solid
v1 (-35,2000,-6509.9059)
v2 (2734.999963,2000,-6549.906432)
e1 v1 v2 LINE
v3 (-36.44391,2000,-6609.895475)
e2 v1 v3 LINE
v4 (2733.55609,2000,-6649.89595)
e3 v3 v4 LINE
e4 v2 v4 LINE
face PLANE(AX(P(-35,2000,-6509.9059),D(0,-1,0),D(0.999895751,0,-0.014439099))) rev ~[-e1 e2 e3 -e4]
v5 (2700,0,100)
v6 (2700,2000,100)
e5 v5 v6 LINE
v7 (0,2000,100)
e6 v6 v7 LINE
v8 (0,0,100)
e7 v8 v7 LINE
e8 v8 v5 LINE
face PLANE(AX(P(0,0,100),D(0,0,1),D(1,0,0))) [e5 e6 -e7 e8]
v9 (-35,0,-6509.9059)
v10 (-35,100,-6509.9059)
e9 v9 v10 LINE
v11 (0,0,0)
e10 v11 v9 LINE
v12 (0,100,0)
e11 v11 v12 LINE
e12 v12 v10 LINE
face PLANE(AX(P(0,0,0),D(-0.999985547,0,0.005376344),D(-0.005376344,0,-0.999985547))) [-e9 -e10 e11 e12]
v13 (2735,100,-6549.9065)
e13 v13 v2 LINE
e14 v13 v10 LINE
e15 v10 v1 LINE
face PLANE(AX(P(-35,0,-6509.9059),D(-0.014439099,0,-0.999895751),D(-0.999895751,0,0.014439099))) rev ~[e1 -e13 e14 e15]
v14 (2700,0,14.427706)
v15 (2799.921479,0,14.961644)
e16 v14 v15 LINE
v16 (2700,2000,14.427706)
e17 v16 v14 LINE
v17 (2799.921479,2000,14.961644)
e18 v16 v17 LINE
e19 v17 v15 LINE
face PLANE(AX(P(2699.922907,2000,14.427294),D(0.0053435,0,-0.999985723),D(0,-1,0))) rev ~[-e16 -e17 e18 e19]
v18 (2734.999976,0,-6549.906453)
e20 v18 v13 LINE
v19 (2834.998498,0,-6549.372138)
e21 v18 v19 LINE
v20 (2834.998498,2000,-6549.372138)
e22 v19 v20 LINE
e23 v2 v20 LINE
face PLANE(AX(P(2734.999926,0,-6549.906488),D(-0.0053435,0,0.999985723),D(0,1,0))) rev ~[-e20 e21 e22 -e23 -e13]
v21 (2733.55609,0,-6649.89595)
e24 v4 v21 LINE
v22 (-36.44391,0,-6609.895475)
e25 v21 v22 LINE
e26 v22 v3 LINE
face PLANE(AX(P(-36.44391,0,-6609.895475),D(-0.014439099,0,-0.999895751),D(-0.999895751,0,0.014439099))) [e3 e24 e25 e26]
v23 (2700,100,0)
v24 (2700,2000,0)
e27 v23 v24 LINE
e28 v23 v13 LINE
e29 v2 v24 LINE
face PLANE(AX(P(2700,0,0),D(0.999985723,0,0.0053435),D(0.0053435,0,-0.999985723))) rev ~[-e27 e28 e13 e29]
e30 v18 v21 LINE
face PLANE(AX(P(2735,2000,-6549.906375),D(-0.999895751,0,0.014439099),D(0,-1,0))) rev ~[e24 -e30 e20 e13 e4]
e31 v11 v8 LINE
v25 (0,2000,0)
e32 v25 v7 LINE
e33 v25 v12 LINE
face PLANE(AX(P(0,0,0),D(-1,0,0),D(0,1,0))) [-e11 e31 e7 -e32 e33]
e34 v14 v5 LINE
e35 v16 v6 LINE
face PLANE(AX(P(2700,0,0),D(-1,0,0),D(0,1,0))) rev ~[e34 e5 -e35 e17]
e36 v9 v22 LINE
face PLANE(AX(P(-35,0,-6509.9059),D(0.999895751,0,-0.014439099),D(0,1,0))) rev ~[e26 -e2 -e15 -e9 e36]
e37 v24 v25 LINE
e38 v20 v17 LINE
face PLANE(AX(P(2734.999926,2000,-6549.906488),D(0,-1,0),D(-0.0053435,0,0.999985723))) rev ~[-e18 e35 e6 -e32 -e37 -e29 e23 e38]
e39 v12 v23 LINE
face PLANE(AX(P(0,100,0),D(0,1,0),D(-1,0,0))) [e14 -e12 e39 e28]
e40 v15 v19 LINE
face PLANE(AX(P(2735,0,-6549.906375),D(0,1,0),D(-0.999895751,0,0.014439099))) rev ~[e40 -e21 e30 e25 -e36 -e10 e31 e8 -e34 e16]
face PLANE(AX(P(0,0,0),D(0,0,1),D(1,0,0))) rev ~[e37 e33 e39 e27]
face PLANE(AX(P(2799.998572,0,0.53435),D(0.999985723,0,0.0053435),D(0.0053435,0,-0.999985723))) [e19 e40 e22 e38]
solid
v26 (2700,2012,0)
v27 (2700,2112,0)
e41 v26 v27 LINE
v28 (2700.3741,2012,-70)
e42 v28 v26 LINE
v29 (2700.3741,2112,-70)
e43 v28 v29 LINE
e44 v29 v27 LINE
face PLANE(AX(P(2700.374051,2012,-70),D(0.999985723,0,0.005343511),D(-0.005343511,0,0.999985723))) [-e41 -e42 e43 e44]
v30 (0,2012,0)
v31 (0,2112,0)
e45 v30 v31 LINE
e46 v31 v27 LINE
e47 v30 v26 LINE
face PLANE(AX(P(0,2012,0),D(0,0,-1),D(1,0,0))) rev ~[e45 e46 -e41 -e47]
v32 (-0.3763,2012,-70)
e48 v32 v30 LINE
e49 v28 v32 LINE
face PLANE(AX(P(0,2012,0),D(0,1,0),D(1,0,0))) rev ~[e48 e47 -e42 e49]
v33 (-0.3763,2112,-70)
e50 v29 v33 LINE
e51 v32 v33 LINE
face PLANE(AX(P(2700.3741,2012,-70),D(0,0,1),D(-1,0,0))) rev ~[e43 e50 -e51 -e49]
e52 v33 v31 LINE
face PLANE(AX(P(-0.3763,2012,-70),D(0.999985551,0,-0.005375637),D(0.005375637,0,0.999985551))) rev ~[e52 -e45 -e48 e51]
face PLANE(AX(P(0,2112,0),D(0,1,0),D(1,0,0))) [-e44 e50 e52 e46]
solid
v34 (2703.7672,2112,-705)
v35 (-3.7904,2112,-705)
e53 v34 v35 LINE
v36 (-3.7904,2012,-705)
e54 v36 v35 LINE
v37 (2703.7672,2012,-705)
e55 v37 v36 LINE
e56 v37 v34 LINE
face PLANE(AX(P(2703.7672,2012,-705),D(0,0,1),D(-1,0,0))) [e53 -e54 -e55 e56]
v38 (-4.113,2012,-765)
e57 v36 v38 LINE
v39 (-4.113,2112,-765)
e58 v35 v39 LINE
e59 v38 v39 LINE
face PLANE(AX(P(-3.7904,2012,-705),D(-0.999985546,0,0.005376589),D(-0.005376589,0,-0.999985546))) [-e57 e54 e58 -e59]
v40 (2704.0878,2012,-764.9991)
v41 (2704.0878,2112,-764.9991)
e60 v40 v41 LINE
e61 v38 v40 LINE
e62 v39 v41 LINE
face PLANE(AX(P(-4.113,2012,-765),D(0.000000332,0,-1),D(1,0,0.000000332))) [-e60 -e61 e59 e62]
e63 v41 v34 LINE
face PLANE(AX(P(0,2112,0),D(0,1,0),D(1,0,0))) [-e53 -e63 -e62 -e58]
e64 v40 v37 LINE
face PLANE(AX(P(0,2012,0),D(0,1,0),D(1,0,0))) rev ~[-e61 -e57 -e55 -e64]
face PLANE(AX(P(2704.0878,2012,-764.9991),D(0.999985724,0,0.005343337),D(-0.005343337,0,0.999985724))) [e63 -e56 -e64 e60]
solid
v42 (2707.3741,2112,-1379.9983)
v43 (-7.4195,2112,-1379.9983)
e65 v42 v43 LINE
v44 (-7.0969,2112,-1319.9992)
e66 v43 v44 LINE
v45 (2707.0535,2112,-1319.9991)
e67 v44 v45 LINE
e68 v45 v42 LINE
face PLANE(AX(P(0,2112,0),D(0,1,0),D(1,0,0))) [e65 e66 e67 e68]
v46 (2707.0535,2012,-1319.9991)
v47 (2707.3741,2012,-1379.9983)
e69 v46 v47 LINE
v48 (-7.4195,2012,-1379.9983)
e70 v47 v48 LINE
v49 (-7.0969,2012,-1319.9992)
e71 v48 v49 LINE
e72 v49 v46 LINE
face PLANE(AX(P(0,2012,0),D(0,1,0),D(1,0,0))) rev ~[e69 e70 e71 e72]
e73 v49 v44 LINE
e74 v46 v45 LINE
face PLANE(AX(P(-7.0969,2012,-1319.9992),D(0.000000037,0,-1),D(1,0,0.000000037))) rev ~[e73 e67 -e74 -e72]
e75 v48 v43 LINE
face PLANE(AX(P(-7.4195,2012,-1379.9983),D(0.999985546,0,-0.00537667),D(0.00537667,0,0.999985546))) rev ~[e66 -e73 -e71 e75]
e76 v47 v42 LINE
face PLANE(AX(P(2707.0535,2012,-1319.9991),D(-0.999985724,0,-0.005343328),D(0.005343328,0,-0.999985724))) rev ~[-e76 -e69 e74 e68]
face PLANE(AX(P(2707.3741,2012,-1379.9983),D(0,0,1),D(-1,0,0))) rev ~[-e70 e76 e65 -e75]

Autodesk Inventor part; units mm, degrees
ref_plane "YZ Plane" through (0, 0, 0) normal (1, 0, 0) x (0, 1, 0)
ref_plane "XZ Plane" through (0, 0, 0) normal (0, 1, 0) x (-1, 0, 0)
ref_plane "XY Plane" through (0, 0, 0) normal (0, 0, 1) x (1, 0, 0)
sketch "Skizze1" plane through (0, 0, 0) normal (0, 1, 0) x (-1, 0, 0)
  line L0 (0, 0) -> (35, -6509.9059)
  line L1 (0, 0) -> (-2700, 0)
  line L2 (-2700, 0) -> (-2735, -6549.9065)
  line L3 (-2735, -6549.9065) -> (35, -6509.9059)
  line L4 (-1350, 0) -> (-1350, -6529.9062) construction
  dimension "d0" = 6510
  dimension "d1" = 2700
  dimension "d2" = 6550
  dimension "d3" = 2770
  dimension "d4" = 1350
extrude "Extrusion1" add sketch "Skizze1" along normal blind 100
sketch "Skizze2" plane through (0, 0, 0) normal (0, 0, 1) x (1, 0, 0)
  line L0 (0, 0) -> (0, 100) projected
  line L1 (0, 0) -> (2700, 0)
  line L2 (2700, 0) -> (2700, 2000)
  line L3 (2700, 2000) -> (0, 2000)
  line L4 (0, 2000) -> (0, 0)
  dimension "d7" = 2000
extrude "Extrusion2" add sketch "Skizze2" along normal blind 100
sketch "Skizze3" plane through (2700, 0, 0) normal (0.9999857, 0, 0.0053435) x (0.0053435, 0, -0.9999857)
  line L0 (-14.4275, 0) -> (6550, 0)
  line L1 (6550, 0) -> (6550, 2000)
  line L2 (6550, 2000) -> (-14.4275, 2000)
  line L3 (-14.4275, 2000) -> (-14.4275, 0)
  dimension "d10" = 2000
extrude "Extrusion3" add sketch "Skizze3" along normal blind 100
sketch "Skizze4" plane through (-35, 0, -6509.9059) normal (-0.0144391, 0, -0.9998958) x (-0.9998958, 0, 0.0144391)
  line L0 (-2770.2888, 0) -> (0, 0)
  line L1 (0, 0) -> (0, 2000)
  line L2 (0, 2000) -> (-2770.2888, 2000)
  line L3 (-2770.2888, 2000) -> (-2770.2888, 0)
  line L4 (0, 0) -> (-2770.2888, 0) projected
  point P0 (59.0011, 0)
  dimension "d13" = 2000
extrude "Extrusion4" add sketch "Skizze4" along normal blind 100
ref_plane "Arbeitsebene1" through (0, 2012, 0) normal (0, 1, 0) x (1, 0, 0)
sketch "Skizze5" plane through (0, 2012, 0) normal (0, 1, 0) x (1, 0, 0)
  line L0 (0, 0) -> (2700, 0) projected
  line L1 (0, 0) -> (2700.3741, 0)
  line L2 (2700.3741, 0) -> (2700.3741, 70)
  line L3 (2700.3741, 70) -> (-0.3763, 70)
  line L4 (-0.3763, 70) -> (0, 0)
  line L5 (2735, 6549.9065) -> (2700, 0) projected
  line L6 (-35, 6509.9059) -> (0, 0) projected
  dimension "d17" = 70
extrude "Extrusion5" add sketch "Skizze5" along normal blind 100 contours L4 L3 L5 L0
sketch "Skizze6" plane through (0, 2012, 0) normal (0, 1, 0) x (1, 0, 0)
  line L0 (2703.7672, 705) -> (-3.7904, 705)
  line L1 (-3.7904, 705) -> (-4.113, 765)
  line L2 (-4.113, 765) -> (2704.0878, 764.9991)
  line L3 (2704.0878, 764.9991) -> (2703.7672, 705)
  line L4 (-35, 6509.9059) -> (0, 0) projected
  line L5 (2700.3741, 70) -> (-0.3763, 70) projected
  line L6 (2735, 6549.9065) -> (2700, 0) projected
  dimension "d20" = 635
  dimension "d21" = 60
  dimension "d22" = 60
extrude "Extrusion6" add sketch "Skizze6" along normal blind 100 contours L0 L1 L2 L3
sketch "Skizze7" plane through (0, 2012, 0) normal (0, 1, 0) x (1, 0, 0)
  line L0 (2707.3741, 1379.9983) -> (-7.4195, 1379.9983)
  line L1 (-7.4195, 1379.9983) -> (-7.0969, 1319.9992)
  line L2 (-7.0969, 1319.9992) -> (2707.0535, 1319.9991)
  line L3 (2707.0535, 1319.9991) -> (2707.3741, 1379.9983)
  line L4 (2735, 6549.9065) -> (2700, 0) projected
  line L5 (-35, 6509.9059) -> (0, 0) projected
  line L6 (2704.0878, 764.9991) -> (-4.113, 765) projected
  dimension "d25" = 60
  dimension "d26" = 60
  dimension "d27" = 555
extrude "Extrusion7" add sketch "Skizze7" along normal blind 100 contours L3 L2 L1 L0
sketch "Skizze8" plane through (0, 2012, 0) normal (0, 1, 0) x (1, 0, 0)
  line L0 (2700, 0) -> (2735, 6549.9065) construction
  line L1 (2710.3398, 1934.9983) -> (-10.4034, 1934.9983)
  line L2 (-10.4034, 1934.9983) -> (-10.726, 1994.9983)
  line L3 (-10.726, 1994.9983) -> (2710.6604, 1994.9983)
  line L4 (2710.6604, 1994.9983) -> (2710.3398, 1934.9983)
  line L5 (-35, 6509.9059) -> (0, 0) construction
  line L6 (2707.3741, 1379.9983) -> (-7.4195, 1379.9983) projected
  line L7 (2735, 6549.9065) -> (2733.5561, 6649.8961) projected
  line L8 (2735, 6549.9065) -> (-35, 6509.9059)
  line L9 (-35, 6509.9059) -> (-34.6237, 6439.9059)
  line L10 (-34.6237, 6439.9059) -> (2734.6259, 6479.8938)
  line L11 (2734.6259, 6479.8938) -> (2735, 6549.9065)
  line L12 (2731.1525, 5829.8938) -> (-31.344, 5829.8938)
  line L13 (0, 0) -> (-35, 6509.9059) projected
  line L14 (2730.8319, 5769.8938) -> (-31.0214, 5769.8938)
  dimension "d30" = 60
  dimension "d31" = 60
  dimension "d32" = 555
  dimension "d33" = 70
  dimension "d34" = 70
  dimension "d35" = 60
  dimension "d36" = 60
  dimension "d37" = 650
equation "\"d4\" = 0.5 * d1"
properties part number "Garage"
